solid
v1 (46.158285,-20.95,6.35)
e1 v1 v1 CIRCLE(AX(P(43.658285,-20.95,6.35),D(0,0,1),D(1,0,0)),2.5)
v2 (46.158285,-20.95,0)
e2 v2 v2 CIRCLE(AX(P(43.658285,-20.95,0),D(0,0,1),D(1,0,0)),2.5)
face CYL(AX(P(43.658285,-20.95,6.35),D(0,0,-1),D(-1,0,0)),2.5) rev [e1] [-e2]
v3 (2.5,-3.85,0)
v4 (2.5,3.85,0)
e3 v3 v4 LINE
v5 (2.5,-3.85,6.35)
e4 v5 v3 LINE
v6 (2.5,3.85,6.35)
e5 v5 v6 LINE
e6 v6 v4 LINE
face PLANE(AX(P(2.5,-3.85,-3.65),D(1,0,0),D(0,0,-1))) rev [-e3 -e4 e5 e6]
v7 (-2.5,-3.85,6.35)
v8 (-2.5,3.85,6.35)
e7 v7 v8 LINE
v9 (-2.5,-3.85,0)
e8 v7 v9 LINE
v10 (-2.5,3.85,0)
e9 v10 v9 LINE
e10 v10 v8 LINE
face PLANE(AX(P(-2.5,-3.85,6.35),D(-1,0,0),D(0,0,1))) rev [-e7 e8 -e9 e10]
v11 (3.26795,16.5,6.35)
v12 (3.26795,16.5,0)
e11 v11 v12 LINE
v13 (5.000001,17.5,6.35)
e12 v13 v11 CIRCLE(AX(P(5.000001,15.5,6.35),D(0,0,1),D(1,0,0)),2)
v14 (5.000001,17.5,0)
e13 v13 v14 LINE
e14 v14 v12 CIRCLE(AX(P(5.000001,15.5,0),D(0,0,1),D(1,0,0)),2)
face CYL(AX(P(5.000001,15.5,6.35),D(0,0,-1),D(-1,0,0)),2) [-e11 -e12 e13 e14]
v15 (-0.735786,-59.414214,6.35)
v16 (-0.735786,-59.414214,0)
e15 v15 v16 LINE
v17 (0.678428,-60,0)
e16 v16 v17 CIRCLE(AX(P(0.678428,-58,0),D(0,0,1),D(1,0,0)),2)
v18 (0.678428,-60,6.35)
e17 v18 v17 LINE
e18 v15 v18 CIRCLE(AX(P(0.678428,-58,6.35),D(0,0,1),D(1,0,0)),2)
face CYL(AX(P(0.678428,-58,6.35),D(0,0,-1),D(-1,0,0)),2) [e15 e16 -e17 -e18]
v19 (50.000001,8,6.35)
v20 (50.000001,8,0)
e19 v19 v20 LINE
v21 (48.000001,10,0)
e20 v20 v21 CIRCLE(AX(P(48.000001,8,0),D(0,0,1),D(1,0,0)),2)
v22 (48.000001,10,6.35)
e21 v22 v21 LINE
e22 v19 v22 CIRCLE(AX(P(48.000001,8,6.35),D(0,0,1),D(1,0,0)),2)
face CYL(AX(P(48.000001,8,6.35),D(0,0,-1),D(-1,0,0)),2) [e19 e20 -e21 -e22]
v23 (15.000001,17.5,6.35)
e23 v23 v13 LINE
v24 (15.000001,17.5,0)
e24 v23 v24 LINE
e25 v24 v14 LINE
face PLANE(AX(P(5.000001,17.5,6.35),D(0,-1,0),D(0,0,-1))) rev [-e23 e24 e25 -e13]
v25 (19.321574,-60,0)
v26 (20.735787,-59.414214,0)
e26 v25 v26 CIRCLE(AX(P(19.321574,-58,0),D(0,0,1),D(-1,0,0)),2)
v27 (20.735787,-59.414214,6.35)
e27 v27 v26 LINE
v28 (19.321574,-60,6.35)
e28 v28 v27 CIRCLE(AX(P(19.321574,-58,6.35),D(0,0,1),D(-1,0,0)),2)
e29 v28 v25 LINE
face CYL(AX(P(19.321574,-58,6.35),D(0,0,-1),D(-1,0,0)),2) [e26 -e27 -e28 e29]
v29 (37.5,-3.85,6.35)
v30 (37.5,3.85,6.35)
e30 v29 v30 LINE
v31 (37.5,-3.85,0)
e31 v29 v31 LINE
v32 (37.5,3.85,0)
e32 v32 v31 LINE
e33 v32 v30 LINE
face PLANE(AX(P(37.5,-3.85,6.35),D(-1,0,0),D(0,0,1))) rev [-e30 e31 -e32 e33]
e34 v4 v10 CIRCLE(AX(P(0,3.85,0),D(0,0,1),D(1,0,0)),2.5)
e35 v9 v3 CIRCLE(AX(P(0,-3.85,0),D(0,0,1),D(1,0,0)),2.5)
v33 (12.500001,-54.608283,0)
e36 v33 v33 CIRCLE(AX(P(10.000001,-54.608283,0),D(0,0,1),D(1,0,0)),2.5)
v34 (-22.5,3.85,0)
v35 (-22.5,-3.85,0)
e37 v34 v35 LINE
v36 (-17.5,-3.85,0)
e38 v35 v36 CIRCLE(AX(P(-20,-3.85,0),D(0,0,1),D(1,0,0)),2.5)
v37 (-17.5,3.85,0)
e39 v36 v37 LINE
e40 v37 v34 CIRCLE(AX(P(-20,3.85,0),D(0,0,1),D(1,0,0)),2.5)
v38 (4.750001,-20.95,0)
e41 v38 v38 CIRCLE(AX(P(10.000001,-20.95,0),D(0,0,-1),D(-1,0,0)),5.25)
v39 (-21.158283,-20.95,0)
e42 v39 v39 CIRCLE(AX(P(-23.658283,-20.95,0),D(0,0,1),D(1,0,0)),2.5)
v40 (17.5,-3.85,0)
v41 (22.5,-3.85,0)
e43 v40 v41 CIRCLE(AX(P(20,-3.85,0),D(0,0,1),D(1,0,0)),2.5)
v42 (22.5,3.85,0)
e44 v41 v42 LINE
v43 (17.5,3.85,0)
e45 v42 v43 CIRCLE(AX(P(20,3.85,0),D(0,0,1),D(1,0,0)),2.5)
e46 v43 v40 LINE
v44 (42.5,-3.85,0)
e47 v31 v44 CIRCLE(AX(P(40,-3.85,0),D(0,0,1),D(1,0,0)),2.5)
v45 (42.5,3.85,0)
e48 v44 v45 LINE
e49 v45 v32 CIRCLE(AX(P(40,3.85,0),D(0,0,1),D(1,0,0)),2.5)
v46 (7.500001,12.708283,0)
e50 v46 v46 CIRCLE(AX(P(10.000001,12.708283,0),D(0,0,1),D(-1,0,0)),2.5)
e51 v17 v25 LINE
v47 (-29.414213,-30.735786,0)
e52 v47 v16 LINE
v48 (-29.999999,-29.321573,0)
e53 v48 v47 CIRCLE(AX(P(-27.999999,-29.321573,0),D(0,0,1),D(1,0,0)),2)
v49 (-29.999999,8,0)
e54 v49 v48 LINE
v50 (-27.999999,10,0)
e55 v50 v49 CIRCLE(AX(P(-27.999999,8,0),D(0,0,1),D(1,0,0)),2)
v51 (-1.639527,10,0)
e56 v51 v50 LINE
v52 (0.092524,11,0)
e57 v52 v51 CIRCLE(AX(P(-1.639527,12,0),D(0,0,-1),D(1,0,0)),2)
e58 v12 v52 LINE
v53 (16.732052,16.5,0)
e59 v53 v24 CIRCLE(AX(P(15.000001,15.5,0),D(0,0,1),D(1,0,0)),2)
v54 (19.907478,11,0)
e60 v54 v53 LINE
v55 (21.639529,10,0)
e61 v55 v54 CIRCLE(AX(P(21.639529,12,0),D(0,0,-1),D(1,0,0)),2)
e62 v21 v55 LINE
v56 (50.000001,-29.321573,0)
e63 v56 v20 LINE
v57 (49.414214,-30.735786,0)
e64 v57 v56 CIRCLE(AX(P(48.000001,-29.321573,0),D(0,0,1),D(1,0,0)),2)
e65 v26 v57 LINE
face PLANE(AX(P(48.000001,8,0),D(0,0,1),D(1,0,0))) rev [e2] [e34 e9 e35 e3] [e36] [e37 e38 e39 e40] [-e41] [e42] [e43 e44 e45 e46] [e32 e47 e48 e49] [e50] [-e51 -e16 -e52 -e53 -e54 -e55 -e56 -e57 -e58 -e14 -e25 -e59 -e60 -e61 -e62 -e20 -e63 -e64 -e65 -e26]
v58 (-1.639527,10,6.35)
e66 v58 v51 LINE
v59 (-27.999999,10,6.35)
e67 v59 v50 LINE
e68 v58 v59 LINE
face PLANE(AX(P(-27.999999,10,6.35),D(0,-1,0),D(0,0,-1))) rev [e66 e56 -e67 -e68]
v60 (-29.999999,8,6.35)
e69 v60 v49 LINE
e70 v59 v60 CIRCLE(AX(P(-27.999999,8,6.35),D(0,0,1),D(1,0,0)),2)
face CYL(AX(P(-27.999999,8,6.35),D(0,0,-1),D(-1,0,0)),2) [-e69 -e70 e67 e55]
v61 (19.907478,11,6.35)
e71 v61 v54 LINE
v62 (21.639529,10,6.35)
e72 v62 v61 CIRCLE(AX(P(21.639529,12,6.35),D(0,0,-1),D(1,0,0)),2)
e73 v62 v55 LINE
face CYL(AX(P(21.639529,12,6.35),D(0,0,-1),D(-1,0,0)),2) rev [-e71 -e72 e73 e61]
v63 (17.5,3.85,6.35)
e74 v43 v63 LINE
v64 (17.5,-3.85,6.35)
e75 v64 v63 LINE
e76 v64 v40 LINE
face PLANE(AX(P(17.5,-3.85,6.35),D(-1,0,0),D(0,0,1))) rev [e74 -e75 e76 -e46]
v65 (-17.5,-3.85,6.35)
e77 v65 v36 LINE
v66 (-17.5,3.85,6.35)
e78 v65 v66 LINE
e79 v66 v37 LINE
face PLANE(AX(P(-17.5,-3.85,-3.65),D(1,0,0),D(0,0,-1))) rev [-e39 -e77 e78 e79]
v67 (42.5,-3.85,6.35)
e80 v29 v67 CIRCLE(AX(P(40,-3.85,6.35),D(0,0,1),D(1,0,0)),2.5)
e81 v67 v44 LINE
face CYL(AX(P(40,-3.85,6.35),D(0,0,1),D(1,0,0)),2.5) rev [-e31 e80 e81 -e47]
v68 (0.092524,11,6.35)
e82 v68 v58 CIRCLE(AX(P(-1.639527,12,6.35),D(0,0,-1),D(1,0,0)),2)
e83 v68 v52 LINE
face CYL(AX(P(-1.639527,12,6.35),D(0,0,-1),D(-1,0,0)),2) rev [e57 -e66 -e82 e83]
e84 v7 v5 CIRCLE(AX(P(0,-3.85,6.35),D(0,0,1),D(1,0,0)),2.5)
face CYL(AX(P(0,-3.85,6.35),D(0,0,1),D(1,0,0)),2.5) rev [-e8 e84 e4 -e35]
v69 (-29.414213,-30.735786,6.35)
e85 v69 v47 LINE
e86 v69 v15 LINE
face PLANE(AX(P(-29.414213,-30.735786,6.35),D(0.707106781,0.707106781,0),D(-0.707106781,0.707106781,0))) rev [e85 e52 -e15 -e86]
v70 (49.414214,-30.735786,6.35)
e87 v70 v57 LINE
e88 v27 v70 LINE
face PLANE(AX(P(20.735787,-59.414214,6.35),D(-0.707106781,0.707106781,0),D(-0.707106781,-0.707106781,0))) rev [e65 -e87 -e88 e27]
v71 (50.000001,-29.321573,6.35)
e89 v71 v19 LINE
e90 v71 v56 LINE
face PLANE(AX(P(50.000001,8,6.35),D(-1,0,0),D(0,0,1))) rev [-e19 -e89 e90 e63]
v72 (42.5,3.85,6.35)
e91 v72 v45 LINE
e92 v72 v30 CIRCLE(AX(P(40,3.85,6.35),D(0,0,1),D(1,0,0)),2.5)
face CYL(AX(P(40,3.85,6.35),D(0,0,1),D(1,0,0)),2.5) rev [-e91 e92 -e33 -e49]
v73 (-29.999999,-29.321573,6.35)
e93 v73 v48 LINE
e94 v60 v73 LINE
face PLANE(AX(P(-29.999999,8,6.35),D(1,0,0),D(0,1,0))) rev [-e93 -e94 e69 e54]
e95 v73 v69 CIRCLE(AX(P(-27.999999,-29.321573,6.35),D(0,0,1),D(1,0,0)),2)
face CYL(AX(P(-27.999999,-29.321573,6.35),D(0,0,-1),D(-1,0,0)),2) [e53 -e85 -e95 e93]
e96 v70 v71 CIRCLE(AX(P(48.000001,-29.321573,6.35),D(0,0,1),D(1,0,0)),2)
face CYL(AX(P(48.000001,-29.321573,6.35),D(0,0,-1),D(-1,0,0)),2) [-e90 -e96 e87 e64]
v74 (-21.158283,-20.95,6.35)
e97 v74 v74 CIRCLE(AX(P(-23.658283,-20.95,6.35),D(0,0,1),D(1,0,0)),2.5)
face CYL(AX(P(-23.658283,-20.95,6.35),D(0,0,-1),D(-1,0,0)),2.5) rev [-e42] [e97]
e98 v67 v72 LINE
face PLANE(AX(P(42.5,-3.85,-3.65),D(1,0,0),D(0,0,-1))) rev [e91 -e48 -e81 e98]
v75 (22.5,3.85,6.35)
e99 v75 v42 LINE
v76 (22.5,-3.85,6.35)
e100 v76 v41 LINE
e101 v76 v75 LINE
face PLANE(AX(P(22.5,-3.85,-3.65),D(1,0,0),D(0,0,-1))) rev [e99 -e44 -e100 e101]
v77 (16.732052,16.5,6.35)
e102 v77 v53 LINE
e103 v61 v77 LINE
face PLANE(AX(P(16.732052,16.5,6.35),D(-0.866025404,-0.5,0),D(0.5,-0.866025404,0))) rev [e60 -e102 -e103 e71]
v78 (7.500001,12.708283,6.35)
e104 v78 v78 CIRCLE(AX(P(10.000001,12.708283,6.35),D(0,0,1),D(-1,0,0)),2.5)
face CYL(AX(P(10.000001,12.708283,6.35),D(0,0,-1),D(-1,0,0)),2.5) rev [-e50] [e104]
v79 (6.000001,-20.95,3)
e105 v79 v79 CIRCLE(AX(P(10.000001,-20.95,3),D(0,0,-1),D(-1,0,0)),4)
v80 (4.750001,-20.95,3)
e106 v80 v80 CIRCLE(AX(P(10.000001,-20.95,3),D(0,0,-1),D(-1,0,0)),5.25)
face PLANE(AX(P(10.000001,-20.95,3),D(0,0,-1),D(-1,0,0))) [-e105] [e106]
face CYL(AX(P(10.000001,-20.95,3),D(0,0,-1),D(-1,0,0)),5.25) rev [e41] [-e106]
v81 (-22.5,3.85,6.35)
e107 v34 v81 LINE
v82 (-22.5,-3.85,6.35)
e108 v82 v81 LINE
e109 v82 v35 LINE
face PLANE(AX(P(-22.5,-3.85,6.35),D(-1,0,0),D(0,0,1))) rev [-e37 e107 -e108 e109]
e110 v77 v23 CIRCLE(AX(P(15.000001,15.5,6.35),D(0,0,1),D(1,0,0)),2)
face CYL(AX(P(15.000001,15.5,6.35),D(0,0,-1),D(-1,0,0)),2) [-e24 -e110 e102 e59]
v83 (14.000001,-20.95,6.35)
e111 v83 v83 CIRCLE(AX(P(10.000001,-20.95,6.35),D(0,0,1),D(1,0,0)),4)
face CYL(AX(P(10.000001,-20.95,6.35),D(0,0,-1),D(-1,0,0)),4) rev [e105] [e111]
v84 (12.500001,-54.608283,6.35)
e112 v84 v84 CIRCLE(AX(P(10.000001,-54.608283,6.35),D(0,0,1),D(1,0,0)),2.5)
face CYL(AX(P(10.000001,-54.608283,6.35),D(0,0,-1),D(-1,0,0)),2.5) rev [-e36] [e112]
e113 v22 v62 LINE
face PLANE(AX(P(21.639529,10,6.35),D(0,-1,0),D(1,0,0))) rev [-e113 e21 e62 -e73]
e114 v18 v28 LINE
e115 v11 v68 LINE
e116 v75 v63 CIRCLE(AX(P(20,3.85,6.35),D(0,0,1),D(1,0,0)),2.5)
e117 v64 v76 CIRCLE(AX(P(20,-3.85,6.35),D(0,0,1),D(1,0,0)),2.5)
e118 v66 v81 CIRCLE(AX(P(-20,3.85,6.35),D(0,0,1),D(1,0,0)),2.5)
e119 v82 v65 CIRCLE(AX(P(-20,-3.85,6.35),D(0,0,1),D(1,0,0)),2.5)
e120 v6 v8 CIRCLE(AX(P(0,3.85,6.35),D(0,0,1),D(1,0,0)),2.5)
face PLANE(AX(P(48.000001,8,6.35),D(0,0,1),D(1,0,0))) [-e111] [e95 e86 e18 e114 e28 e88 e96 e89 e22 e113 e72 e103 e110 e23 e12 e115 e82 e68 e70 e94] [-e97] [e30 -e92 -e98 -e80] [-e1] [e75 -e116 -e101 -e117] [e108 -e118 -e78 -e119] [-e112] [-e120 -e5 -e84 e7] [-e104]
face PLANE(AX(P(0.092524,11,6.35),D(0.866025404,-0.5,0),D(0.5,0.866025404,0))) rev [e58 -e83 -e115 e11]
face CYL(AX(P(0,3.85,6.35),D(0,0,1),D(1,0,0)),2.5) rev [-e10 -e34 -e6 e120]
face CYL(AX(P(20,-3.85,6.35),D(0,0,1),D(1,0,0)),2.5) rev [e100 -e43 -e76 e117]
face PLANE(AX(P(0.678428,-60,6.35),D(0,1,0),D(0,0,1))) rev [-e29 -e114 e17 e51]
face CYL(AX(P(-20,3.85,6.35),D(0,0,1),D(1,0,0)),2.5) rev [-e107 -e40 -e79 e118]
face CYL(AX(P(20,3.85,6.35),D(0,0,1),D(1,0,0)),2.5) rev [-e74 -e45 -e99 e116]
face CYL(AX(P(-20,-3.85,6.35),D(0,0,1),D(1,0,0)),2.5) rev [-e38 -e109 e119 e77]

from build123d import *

# Parameters (mm, degrees)
SKETCH1_R                 = 4
SKETCH1_R_2               = 2.5
BOSS_EXTRUDE1_DEPTH       = 6.35
F_5_0MM_DOWEL_SLOT1_DEPTH = 6.35
SKETCH5_R                 = 5.25
CUT_EXTRUDE1_DEPTH        = 3


# Read off the part's stored shape, not the designer's step: Ø5.0mm Dowel Slot1
with BuildPart() as part:
    # Sketch1 → Boss-Extrude1 (new body)
    with BuildSketch(Plane.XY):
        with BuildLine():
            Line((-27.999999098, 10), (-1.639527193, 10))
            ThreePointArc((-1.639527193, 10), (-0.639527193, 10.267949192), (0.092523614, 11))
            Line((0.092523614, 11), (3.267950095, 16.5))
            ThreePointArc((3.267950095, 16.5), (4.000000902, 17.232050808), (5.000000902, 17.5))
            Line((5.000000902, 17.5), (15.000000902, 17.5))
            ThreePointArc((15.000000902, 17.5), (16.000000902, 17.232050808), (16.73205171, 16.5))
            Line((16.73205171, 16.5), (19.907478191, 11))
            ThreePointArc((19.907478191, 11), (20.639528998, 10.267949192), (21.639528998, 10))
            Line((21.639528998, 10), (48.000000902, 10))
            ThreePointArc((48.000000902, 10), (49.414214465, 9.414213562), (50.000000902, 8))
            Line((50.000000902, 8), (50.000000902, -29.321572875))
            ThreePointArc((50.000000902, -29.321572875), (49.847759967, -30.08693974), (49.414214465, -30.735786438))
            Line((49.414214465, -30.735786438), (20.73578734, -59.414213562))
            ThreePointArc((20.73578734, -59.414213562), (20.086940642, -59.847759065), (19.321573778, -60))
            Line((19.321573778, -60), (0.678428027, -60))
            ThreePointArc((0.678428027, -60), (-0.086938838, -59.847759065), (-0.735785535, -59.414213562))
            Line((-0.735785535, -59.414213562), (-29.41421266, -30.735786438))
            ThreePointArc((-29.41421266, -30.735786438), (-29.847758163, -30.08693974), (-29.999999098, -29.321572875))
            Line((-29.999999098, -29.321572875), (-29.999999098, 8))
            ThreePointArc((-29.999999098, 8), (-29.41421266, 9.414213562), (-27.999999098, 10))
        make_face()
        with Locations((10.000000902, -20.95)):
            Circle(SKETCH1_R, mode=Mode.SUBTRACT)
        with Locations((43.658284542, -20.95)):
            Circle(SKETCH1_R_2, mode=Mode.SUBTRACT)
        with Locations((10.000000902, -54.608282784)):
            Circle(SKETCH1_R_2, mode=Mode.SUBTRACT)
        with Locations((-23.658282737, -20.95)):
            Circle(SKETCH1_R_2, mode=Mode.SUBTRACT)
        with Locations(Location((10.000000902, 12.708282784, 0), (0, 0, 180))):
            Circle(SKETCH1_R_2, mode=Mode.SUBTRACT)
    extrude(amount=BOSS_EXTRUDE1_DEPTH)

    # Ø5.0mm Dowel Slot1 outline → Ø5.0mm Dowel Slot1 (cut)
    with BuildSketch(Plane.XY):
        with BuildLine():
            Line((22.5, -3.85), (22.5, 3.85))
            ThreePointArc((22.5, 3.85), (20, 6.35), (17.5, 3.85))
            Line((17.5, 3.85), (17.5, -3.85))
            ThreePointArc((17.5, -3.85), (20, -6.35), (22.5, -3.85))
        make_face()
        with BuildLine():
            Line((-17.5, -3.85), (-17.5, 3.85))
            ThreePointArc((-17.5, 3.85), (-20, 6.35), (-22.5, 3.85))
            Line((-22.5, 3.85), (-22.5, -3.85))
            ThreePointArc((-22.5, -3.85), (-20, -6.35), (-17.5, -3.85))
        make_face()
        with BuildLine():
            Line((2.5, -3.85), (2.5, 3.85))
            ThreePointArc((2.5, 3.85), (0, 6.35), (-2.5, 3.85))
            Line((-2.5, 3.85), (-2.5, -3.85))
            ThreePointArc((-2.5, -3.85), (0, -6.35), (2.5, -3.85))
        make_face()
        with BuildLine():
            Line((42.5, -3.85), (42.5, 3.85))
            ThreePointArc((42.5, 3.85), (40, 6.35), (37.5, 3.85))
            Line((37.5, 3.85), (37.5, -3.85))
            ThreePointArc((37.5, -3.85), (40, -6.35), (42.5, -3.85))
        make_face()
    extrude(amount=F_5_0MM_DOWEL_SLOT1_DEPTH, mode=Mode.SUBTRACT)

    # Sketch5 → Cut-Extrude1 (cut)
    with BuildSketch(Plane(origin=(0, 0, 0), x_dir=(-1, 0, 0), z_dir=(0, 0, -1))):
        with Locations((-10.000000902, -20.95)):
            Circle(SKETCH5_R)
    extrude(amount=-CUT_EXTRUDE1_DEPTH, mode=Mode.SUBTRACT)


solid = part.part
